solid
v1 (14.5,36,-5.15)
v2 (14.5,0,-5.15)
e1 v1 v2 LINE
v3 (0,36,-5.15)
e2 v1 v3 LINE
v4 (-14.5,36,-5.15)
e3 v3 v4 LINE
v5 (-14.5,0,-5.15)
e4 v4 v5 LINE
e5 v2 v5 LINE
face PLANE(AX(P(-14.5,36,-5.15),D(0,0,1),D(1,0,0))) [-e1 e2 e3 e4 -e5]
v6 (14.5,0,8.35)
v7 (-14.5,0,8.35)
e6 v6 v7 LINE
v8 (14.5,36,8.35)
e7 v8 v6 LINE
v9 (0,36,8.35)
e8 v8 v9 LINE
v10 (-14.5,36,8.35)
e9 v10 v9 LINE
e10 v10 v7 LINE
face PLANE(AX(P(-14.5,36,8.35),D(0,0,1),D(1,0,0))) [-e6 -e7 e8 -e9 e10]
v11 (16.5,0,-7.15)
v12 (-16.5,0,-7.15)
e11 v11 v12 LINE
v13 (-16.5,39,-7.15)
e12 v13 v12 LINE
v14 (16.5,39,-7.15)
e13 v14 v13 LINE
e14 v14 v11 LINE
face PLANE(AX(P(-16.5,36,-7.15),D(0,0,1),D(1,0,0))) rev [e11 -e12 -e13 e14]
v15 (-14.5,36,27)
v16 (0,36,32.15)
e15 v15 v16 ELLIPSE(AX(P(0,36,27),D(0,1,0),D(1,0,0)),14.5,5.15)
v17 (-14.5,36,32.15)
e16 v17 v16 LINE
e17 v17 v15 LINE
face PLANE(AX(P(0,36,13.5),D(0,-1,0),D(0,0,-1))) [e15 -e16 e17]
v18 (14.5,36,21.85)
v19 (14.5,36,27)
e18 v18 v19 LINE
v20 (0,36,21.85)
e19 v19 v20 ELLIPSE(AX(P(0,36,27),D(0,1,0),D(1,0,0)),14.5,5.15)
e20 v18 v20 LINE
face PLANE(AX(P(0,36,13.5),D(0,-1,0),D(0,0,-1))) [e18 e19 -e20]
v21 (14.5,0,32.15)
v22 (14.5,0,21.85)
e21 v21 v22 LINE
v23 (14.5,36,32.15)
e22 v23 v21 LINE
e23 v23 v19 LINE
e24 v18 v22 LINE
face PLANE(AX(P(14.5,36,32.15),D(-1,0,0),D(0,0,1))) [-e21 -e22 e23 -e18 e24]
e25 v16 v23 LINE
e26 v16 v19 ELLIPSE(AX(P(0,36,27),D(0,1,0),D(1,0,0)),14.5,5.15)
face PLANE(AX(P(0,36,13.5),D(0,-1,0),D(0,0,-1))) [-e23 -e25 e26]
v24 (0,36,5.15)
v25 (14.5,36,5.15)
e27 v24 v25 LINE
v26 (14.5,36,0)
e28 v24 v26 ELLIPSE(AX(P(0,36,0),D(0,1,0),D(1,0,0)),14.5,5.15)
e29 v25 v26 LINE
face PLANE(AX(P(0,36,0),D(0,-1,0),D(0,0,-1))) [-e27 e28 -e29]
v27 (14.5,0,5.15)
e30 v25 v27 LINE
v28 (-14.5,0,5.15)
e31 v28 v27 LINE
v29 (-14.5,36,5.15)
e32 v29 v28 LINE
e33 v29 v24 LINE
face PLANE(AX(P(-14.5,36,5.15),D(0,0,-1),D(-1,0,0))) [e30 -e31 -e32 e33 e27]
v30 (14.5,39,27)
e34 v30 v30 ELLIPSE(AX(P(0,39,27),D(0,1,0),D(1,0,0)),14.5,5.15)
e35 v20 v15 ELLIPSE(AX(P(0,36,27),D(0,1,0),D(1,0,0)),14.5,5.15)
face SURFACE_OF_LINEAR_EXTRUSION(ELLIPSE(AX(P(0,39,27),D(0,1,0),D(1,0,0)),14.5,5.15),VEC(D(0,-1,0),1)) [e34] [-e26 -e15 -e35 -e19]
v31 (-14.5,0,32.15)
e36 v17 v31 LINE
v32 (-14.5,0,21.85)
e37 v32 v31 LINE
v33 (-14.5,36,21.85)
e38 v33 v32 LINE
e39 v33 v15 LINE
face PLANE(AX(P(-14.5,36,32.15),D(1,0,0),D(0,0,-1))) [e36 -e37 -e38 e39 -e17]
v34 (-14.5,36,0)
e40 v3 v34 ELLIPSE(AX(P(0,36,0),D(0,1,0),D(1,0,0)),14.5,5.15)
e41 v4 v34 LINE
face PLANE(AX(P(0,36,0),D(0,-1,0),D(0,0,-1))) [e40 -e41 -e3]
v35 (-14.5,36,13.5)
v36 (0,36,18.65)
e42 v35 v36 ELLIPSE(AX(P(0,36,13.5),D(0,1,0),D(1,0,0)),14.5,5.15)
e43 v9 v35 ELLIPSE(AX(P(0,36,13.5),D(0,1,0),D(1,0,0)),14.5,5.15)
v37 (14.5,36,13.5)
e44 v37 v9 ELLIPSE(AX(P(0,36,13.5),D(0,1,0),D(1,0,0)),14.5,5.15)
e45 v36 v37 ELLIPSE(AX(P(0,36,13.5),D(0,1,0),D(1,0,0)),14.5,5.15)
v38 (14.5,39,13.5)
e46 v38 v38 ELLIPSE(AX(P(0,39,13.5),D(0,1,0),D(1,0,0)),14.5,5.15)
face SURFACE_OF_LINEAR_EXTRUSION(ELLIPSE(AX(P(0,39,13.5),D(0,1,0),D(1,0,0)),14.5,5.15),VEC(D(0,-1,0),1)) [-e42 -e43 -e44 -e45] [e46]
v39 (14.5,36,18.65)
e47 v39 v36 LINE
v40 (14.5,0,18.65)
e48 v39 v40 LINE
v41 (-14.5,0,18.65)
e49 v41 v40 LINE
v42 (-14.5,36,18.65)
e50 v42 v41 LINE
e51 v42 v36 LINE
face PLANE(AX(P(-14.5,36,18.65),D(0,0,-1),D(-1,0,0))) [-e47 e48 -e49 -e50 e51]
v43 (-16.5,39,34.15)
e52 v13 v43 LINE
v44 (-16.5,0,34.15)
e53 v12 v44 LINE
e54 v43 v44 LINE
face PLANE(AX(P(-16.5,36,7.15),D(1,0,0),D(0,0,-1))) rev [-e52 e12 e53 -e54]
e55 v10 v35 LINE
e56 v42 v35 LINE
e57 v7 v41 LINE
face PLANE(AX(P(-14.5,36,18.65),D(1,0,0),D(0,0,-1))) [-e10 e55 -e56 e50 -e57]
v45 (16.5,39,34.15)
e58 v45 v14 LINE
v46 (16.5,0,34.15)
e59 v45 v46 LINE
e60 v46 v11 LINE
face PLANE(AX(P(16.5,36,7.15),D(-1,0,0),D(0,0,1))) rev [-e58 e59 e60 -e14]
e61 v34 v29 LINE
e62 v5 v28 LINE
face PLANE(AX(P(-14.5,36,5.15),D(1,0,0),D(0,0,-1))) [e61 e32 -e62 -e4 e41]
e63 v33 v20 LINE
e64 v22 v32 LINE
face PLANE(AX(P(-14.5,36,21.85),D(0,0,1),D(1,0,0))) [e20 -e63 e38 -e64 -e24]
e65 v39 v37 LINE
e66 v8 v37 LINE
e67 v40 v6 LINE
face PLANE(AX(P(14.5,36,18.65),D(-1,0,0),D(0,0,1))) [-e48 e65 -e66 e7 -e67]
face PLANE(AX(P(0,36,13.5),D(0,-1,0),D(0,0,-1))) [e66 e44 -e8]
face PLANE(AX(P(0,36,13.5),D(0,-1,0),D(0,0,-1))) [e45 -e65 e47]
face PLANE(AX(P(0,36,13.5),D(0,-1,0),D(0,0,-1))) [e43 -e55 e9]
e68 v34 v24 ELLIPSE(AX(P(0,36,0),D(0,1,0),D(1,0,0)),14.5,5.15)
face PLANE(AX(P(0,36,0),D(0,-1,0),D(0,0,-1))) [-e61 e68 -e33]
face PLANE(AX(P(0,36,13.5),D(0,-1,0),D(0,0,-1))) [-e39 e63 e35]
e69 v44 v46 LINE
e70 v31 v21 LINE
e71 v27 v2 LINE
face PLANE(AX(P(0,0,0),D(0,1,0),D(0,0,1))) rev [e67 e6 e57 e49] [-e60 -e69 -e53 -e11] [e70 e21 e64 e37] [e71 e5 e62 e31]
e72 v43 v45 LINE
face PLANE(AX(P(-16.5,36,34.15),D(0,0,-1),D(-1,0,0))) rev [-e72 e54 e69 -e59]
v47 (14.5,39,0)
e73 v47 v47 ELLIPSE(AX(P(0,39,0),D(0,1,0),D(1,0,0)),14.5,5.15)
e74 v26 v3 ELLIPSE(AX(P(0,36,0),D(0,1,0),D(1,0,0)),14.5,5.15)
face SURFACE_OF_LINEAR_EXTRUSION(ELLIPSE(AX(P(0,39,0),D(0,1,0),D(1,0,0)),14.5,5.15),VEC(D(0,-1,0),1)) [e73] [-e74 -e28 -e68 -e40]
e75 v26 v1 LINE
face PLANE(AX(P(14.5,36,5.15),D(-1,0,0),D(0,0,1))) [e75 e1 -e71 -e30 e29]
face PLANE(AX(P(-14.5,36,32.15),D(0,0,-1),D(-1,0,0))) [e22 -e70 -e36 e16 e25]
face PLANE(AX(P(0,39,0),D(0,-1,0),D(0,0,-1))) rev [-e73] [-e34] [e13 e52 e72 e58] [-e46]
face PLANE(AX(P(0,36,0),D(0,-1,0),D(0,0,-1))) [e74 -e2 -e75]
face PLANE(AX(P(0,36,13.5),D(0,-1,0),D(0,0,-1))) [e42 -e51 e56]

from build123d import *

# Parameters (mm, degrees)
SKETCH_1_W             = 33
SKETCH_1_H             = 14.3
SKETCH_1_W_2           = 29
SKETCH_1_H_2           = 10.3
EXTRUDE_2_DEPTH        = 36
SKETCH_2_W             = 33
SKETCH_2_H             = 14.3
SKETCH_2_RX            = 14.5
SKETCH_2_RY            = 5.15
EXTRUDE_3_DEPTH        = 3
PATTERN_LINEAR_1_COUNT = 3
PATTERN_LINEAR_1_PITCH = 13.5


with BuildPart() as part:
    # 草图1 → 凸台-拉伸2 (new body)
    with BuildSketch(Plane(origin=(0, 0, 0), x_dir=(1, 0, 0), z_dir=(0, 1, 0))):
        Rectangle(SKETCH_1_W, SKETCH_1_H)
        Rectangle(SKETCH_1_W_2, SKETCH_1_H_2, mode=Mode.SUBTRACT)
    extrude_2 = extrude(amount=EXTRUDE_2_DEPTH)

    # 草图2 → 凸台-拉伸3 (add)
    with BuildSketch(Plane(origin=(0, 36, 0), x_dir=(1, 0, 0), z_dir=(0, 1, 0))):
        Rectangle(SKETCH_2_W, SKETCH_2_H)
        with Locations(Location((0, 0), (0, 0, 0))):
            Ellipse(SKETCH_2_RX, SKETCH_2_RY, mode=Mode.SUBTRACT)
    extrude_3 = extrude(amount=EXTRUDE_3_DEPTH)

    # 阵列(线性)1: 凸台-拉伸2, 凸台-拉伸3 ×3
    with Locations(*[(0, 0, i * PATTERN_LINEAR_1_PITCH) for i in range(1, PATTERN_LINEAR_1_COUNT)]):
        add(extrude_2)
        add(extrude_3)


solid = part.part
